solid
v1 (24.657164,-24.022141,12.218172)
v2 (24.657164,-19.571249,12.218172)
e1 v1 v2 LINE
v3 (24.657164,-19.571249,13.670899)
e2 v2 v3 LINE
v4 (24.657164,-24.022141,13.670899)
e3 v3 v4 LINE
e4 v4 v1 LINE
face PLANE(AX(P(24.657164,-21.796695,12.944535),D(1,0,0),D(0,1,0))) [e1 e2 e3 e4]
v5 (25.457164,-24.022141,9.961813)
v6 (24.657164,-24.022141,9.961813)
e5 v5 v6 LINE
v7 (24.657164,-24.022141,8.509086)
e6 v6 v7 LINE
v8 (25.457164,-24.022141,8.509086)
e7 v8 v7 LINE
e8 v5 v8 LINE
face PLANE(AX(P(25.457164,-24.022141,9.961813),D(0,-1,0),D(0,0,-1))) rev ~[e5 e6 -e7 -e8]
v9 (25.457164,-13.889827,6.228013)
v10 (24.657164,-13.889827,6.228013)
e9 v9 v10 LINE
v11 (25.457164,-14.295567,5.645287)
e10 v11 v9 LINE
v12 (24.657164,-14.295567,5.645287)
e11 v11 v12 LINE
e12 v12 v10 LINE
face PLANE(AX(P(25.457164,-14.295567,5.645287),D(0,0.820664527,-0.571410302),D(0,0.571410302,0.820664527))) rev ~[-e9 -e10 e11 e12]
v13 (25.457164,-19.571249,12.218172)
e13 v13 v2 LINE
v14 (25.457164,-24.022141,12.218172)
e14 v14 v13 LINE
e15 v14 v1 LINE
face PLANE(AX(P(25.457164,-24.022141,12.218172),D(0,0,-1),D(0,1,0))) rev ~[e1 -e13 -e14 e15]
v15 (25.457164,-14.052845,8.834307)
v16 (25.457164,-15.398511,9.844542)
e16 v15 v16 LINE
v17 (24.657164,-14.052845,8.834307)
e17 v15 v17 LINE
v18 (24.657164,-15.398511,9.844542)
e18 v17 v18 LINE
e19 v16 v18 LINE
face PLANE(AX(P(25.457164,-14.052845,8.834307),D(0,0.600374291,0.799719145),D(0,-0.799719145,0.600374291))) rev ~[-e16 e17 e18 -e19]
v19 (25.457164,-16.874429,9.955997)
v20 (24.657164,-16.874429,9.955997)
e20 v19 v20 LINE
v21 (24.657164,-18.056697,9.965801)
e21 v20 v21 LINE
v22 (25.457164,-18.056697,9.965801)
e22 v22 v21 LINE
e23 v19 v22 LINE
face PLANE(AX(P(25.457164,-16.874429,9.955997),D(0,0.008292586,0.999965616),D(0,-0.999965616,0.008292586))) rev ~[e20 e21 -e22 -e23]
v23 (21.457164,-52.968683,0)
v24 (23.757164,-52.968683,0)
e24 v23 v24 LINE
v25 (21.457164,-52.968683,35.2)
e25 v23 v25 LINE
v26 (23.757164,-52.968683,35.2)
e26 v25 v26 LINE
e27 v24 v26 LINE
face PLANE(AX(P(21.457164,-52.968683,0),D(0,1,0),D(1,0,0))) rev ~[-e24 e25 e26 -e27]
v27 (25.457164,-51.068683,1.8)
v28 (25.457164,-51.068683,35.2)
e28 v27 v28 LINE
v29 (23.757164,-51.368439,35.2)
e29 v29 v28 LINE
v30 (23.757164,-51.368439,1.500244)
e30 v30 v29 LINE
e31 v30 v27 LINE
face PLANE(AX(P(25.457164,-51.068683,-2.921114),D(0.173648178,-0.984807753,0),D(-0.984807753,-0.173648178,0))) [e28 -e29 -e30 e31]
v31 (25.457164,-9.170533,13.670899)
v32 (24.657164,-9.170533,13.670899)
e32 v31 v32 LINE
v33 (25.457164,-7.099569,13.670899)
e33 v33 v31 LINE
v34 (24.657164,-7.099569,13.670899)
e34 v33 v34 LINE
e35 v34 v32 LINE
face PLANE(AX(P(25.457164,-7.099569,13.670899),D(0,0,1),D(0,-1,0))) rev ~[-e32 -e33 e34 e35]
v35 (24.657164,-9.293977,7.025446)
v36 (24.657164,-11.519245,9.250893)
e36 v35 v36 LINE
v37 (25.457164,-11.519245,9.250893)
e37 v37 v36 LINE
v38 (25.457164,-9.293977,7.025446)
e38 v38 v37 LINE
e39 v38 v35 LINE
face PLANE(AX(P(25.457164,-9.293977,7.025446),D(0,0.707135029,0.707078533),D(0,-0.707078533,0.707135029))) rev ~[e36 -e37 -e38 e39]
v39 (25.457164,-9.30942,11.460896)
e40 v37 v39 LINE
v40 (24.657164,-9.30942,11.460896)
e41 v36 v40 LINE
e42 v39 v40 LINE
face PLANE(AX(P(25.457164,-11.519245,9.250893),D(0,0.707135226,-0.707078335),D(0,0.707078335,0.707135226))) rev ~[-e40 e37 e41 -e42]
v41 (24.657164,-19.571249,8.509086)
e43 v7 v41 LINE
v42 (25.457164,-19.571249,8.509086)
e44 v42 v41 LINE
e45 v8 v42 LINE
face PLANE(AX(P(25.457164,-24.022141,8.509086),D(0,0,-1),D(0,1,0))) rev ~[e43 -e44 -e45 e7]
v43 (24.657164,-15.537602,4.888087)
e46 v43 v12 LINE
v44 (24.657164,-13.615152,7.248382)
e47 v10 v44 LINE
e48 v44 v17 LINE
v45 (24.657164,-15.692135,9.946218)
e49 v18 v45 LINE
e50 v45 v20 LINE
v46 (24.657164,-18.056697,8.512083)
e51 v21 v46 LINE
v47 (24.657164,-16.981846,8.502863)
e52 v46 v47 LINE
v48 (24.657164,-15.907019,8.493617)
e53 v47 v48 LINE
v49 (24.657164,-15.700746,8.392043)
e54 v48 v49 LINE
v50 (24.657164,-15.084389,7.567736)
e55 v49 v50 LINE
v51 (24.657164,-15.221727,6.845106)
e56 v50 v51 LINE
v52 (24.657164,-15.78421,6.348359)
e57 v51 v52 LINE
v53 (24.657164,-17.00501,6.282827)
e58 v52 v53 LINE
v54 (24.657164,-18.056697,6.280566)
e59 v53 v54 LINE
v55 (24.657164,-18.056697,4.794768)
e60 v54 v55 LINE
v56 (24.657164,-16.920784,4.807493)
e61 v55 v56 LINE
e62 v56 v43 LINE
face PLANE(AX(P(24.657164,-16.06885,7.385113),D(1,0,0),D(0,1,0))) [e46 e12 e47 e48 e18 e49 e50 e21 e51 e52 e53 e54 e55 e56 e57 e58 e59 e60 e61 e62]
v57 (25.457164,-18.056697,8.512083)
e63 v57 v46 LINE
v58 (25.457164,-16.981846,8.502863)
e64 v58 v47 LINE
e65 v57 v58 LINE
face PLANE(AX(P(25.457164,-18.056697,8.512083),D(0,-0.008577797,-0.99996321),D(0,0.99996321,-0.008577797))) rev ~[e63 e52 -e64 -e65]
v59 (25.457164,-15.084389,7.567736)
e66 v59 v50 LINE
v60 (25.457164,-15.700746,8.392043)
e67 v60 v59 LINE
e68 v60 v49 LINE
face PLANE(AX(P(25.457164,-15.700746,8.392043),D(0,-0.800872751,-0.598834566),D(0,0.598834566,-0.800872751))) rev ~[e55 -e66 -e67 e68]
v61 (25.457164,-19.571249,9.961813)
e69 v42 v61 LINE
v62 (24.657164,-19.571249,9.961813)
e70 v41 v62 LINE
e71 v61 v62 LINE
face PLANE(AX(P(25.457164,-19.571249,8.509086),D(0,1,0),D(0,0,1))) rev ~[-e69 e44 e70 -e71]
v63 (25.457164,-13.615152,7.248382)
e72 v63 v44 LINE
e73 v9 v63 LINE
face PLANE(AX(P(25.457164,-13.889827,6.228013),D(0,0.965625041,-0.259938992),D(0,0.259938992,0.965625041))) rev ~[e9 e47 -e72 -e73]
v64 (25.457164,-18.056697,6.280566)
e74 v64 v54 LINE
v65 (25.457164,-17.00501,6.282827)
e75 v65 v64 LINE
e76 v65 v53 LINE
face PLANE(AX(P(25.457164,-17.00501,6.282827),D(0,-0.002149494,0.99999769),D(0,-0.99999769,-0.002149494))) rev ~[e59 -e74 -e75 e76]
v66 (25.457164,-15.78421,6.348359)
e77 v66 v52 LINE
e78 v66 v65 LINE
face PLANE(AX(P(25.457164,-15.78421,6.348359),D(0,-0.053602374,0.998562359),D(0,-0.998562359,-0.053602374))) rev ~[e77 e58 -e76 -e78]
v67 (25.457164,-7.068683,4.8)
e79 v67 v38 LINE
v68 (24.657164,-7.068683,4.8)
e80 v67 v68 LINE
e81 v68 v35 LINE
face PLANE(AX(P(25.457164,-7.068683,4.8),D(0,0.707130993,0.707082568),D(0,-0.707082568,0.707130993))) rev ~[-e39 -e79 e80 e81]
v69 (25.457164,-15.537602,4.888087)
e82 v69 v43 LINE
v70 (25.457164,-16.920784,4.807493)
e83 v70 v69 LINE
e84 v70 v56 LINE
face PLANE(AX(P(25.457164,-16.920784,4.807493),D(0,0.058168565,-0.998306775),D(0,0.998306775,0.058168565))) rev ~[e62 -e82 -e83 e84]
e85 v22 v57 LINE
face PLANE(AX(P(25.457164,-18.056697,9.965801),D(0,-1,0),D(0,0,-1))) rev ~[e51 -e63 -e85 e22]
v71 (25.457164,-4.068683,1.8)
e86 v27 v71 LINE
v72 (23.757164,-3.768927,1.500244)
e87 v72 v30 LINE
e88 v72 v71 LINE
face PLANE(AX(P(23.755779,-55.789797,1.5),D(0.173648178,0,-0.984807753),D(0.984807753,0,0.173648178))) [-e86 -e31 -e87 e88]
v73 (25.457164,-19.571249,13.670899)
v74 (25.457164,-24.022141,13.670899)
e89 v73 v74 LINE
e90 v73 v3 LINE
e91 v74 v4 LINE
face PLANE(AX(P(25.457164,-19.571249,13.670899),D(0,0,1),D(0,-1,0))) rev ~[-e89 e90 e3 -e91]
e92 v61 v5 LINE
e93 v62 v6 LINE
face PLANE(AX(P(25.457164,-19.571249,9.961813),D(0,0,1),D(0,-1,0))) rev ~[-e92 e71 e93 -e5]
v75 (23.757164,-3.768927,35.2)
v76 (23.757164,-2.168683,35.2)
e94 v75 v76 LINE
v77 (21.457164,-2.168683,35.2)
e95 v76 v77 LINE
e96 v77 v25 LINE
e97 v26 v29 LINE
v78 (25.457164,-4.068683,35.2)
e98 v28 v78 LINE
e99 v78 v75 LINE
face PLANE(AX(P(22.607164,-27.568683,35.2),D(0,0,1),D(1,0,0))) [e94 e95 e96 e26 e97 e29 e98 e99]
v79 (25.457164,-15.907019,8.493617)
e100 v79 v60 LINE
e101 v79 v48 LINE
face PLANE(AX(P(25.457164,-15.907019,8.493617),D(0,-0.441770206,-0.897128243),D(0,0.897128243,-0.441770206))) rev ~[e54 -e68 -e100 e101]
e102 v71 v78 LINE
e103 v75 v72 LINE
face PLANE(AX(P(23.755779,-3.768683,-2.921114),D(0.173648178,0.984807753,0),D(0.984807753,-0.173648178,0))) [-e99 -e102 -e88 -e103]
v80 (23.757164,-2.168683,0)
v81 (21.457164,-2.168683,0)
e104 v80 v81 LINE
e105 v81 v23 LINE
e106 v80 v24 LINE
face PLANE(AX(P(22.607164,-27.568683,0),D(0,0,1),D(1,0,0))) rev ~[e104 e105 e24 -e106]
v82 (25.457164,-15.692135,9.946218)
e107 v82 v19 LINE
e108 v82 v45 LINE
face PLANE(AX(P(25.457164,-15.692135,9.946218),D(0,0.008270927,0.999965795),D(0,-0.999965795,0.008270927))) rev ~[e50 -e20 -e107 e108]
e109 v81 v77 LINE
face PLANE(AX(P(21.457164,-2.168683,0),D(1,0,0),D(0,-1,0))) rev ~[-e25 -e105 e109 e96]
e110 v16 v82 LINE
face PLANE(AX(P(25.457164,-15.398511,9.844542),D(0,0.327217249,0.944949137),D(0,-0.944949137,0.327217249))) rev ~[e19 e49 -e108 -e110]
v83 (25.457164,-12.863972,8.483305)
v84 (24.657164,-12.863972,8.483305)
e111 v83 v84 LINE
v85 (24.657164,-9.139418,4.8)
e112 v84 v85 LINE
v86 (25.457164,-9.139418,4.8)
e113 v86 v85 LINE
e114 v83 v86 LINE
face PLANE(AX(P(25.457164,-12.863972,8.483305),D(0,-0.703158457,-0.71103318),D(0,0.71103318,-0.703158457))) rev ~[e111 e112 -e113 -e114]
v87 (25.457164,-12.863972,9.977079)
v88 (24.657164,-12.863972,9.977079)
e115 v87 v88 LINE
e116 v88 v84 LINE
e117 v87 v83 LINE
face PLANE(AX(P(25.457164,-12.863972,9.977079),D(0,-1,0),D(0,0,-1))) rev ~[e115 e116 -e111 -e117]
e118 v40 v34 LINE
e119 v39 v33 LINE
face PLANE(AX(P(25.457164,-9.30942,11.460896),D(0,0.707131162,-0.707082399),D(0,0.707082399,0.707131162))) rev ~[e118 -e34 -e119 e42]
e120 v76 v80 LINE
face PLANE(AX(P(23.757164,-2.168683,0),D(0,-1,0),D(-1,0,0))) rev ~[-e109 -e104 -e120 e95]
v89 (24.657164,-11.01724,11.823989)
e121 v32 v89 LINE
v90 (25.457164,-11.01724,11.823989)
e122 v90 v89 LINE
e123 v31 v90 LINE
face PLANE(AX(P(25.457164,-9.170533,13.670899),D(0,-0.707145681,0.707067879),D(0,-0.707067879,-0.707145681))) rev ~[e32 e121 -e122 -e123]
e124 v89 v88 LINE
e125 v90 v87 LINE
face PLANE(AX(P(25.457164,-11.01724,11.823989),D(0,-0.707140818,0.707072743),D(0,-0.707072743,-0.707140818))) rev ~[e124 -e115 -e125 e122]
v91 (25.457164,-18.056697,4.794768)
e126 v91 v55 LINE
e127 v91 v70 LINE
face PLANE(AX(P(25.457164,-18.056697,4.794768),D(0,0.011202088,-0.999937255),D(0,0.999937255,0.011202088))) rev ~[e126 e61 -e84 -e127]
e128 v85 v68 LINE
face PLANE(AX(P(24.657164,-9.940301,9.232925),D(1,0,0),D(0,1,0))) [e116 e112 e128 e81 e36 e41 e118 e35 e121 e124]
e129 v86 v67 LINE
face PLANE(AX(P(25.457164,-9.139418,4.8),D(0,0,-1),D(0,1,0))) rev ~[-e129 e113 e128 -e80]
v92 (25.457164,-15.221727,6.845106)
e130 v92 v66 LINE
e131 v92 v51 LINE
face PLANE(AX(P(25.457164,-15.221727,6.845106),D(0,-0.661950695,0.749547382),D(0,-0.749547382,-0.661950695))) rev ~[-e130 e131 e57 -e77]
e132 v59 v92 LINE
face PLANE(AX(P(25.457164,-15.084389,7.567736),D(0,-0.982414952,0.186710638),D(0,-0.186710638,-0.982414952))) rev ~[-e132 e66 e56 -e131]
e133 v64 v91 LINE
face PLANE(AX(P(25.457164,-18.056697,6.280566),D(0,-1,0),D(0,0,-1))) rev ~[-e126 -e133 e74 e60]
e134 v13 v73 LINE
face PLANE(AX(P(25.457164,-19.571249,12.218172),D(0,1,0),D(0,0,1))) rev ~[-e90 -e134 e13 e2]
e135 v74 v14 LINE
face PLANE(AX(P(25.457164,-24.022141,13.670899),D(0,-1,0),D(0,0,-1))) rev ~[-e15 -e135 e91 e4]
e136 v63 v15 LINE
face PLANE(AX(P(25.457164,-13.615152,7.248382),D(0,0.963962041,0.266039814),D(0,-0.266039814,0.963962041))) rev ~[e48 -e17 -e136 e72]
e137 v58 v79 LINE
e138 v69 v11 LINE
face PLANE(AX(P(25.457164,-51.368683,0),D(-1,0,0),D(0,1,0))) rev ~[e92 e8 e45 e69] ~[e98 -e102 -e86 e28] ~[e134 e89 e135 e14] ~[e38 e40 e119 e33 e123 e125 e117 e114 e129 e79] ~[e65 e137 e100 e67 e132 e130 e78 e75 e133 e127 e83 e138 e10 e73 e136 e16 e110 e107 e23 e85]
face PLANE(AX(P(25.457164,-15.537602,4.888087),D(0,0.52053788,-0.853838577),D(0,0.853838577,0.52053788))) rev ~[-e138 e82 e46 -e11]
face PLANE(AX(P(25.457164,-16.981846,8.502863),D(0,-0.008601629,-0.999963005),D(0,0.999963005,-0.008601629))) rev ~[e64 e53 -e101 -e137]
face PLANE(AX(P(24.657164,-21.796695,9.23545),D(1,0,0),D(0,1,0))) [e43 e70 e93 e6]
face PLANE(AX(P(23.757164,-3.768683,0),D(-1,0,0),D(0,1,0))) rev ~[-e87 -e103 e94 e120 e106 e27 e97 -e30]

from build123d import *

# Parameters (mm, degrees)
F0_W         = 1.7
F0_H         = 47.6
F1_DEPTH     = 35.2
F2_DEPTH     = 1.5
F3_T4_DEPTH  = 42.5422275002
F3_T9_DEPTH  = 56.4422275002
F3_T14_DEPTH = 42.5422275002
F5_DEPTH     = 0.8


# Not quite as in the source:
# - a fillet or chamfer that OpenCascade refuses, or shapes differently, is made with other operations: its cross-section is extruded or revolved along the edge and cut away or added
# - ends of sketch curves that miss each other by under 0.0002 mm in the source are joined


with BuildPart() as f1:
    # F0 (on Top) → F1 (new body)
    with BuildSketch(Plane.XY):
        Polygon((21.457163617, -2.1686828911), (21.457163617, -52.9686828911), (23.757163617, -52.9686828911), (23.757163617, -51.3686828911), (23.757163617, -3.7686828911), (23.757163617, -2.1686828911), align=None)
        with Locations((24.607163617, -27.5686828911)):
            Rectangle(F0_W, F0_H)
    extrude(amount=F1_DEPTH)

    # F0 (on Top) → F2 (cut)
    with BuildSketch(Plane.XY):
        with Locations((24.607163617, -27.5686828911)):
            Rectangle(F0_W, F0_H)
    extrude(amount=F2_DEPTH, mode=Mode.SUBTRACT)

    # F3: chamfer of 0.3 x 1.7013845459 on 3 edges, made by hand


with BuildPart() as f3_tool2:
    # F3_s3 → F3_t4 (new body)
    with BuildSketch(Plane.XY.offset(-2.9211137501)):
        Polygon((25.457163617, -51.0686828911), (23.7557790711, -51.3686828911), (25.457163617, -51.3686828911), align=None)
    extrude(amount=F3_T4_DEPTH)

    split(bisect_by=Plane.YZ.offset(23.757163617), keep=Keep.TOP)


with BuildPart() as f1_1:
    add(f1.part)

    # F3_t1: cut F3_tool2
    add(f3_tool2.part, mode=Mode.SUBTRACT)


with BuildPart() as f3_tool7:
    # F3_s8 → F3_t9 (new body)
    with BuildSketch(Plane.XZ.offset(55.7897966412)):
        Polygon((23.7557790711, 1.5), (25.457163617, 1.8), (25.457163617, 1.5), align=None)
    extrude(amount=-F3_T9_DEPTH)

    split(bisect_by=Plane.YZ.offset(23.757163617), keep=Keep.TOP)


with BuildPart() as f1_2:
    add(f1_1.part)

    # F3_t6: cut F3_tool7
    add(f3_tool7.part, mode=Mode.SUBTRACT)


with BuildPart() as f3_tool12:
    # F3_s13 → F3_t14 (new body)
    with BuildSketch(Plane.XY.offset(-2.9211137501)):
        Polygon((23.7557790711, -3.7686828911), (25.457163617, -4.0686828911), (25.457163617, -3.7686828911), align=None)
    extrude(amount=F3_T14_DEPTH)

    split(bisect_by=Plane.YZ.offset(23.757163617), keep=Keep.TOP)


with BuildPart() as f1_3:
    add(f1_2.part)

    # F3_t11: cut F3_tool12
    add(f3_tool12.part, mode=Mode.SUBTRACT)

    # F4 (on face) → F5 (cut)
    with BuildSketch(Plane.YZ.offset(25.457163617)):
        Polygon((-24.0221414911, 13.6708992), (-24.0221414911, 12.9445354), (-24.0221414911, 12.2181716), (-21.7966950911, 12.2181716), (-19.5712486911, 12.2181716), (-19.5712486911, 12.9445354), (-19.5712486911, 13.6708992), (-21.7966950911, 13.6708992), align=None)
        Polygon((-24.0221414911, 9.9618134), (-24.0221414911, 9.2354496), (-24.0221414911, 8.5090858), (-21.7966950911, 8.5090858), (-19.5712486911, 8.5090858), (-19.5712486911, 9.2354496), (-19.5712486911, 9.9618134), (-21.7966950911, 9.9618134), align=None)
        Polygon((-18.0566974911, 6.280566), (-18.0566974911, 5.5376414), (-18.0566974911, 4.7947676), (-16.9207840911, 4.807493), (-15.5376016911, 4.8880872), (-14.2955670911, 5.6452866), (-13.8898274911, 6.2280134), (-13.6151518911, 7.2483822), (-14.0528446911, 8.8343074), (-15.3985112911, 9.8445416), (-15.6921352911, 9.9462178), (-16.8744290911, 9.9559968), (-18.0566974911, 9.9658012), (-18.0566974911, 9.2389548), (-18.0566974911, 8.512083), (-16.9818456911, 8.5028628), (-15.9070192911, 8.4936172), (-15.7007458911, 8.3920426), (-15.0843894911, 7.5677364), (-15.2217272911, 6.8451064), (-15.7842102911, 6.3483586), (-17.0050104911, 6.2828266), align=None)
        Polygon((-12.8639722911, 8.4833048), (-11.0016950911, 6.6416524), (-9.1394178911, 4.8), (-8.1040376911, 4.8), (-7.0686828911, 4.8), (-9.2939768911, 7.0254464), (-11.5192454911, 9.2508928), (-9.3094200911, 11.460896), (-7.0995692911, 13.6708992), (-8.1350510911, 13.6708992), (-9.1705328911, 13.6708992), (-11.0172398911, 11.823989), (-12.8639722911, 9.9770788), (-12.8639722911, 9.2301918), align=None)
    extrude(amount=-F5_DEPTH, mode=Mode.SUBTRACT)


solid = f1_3.part
